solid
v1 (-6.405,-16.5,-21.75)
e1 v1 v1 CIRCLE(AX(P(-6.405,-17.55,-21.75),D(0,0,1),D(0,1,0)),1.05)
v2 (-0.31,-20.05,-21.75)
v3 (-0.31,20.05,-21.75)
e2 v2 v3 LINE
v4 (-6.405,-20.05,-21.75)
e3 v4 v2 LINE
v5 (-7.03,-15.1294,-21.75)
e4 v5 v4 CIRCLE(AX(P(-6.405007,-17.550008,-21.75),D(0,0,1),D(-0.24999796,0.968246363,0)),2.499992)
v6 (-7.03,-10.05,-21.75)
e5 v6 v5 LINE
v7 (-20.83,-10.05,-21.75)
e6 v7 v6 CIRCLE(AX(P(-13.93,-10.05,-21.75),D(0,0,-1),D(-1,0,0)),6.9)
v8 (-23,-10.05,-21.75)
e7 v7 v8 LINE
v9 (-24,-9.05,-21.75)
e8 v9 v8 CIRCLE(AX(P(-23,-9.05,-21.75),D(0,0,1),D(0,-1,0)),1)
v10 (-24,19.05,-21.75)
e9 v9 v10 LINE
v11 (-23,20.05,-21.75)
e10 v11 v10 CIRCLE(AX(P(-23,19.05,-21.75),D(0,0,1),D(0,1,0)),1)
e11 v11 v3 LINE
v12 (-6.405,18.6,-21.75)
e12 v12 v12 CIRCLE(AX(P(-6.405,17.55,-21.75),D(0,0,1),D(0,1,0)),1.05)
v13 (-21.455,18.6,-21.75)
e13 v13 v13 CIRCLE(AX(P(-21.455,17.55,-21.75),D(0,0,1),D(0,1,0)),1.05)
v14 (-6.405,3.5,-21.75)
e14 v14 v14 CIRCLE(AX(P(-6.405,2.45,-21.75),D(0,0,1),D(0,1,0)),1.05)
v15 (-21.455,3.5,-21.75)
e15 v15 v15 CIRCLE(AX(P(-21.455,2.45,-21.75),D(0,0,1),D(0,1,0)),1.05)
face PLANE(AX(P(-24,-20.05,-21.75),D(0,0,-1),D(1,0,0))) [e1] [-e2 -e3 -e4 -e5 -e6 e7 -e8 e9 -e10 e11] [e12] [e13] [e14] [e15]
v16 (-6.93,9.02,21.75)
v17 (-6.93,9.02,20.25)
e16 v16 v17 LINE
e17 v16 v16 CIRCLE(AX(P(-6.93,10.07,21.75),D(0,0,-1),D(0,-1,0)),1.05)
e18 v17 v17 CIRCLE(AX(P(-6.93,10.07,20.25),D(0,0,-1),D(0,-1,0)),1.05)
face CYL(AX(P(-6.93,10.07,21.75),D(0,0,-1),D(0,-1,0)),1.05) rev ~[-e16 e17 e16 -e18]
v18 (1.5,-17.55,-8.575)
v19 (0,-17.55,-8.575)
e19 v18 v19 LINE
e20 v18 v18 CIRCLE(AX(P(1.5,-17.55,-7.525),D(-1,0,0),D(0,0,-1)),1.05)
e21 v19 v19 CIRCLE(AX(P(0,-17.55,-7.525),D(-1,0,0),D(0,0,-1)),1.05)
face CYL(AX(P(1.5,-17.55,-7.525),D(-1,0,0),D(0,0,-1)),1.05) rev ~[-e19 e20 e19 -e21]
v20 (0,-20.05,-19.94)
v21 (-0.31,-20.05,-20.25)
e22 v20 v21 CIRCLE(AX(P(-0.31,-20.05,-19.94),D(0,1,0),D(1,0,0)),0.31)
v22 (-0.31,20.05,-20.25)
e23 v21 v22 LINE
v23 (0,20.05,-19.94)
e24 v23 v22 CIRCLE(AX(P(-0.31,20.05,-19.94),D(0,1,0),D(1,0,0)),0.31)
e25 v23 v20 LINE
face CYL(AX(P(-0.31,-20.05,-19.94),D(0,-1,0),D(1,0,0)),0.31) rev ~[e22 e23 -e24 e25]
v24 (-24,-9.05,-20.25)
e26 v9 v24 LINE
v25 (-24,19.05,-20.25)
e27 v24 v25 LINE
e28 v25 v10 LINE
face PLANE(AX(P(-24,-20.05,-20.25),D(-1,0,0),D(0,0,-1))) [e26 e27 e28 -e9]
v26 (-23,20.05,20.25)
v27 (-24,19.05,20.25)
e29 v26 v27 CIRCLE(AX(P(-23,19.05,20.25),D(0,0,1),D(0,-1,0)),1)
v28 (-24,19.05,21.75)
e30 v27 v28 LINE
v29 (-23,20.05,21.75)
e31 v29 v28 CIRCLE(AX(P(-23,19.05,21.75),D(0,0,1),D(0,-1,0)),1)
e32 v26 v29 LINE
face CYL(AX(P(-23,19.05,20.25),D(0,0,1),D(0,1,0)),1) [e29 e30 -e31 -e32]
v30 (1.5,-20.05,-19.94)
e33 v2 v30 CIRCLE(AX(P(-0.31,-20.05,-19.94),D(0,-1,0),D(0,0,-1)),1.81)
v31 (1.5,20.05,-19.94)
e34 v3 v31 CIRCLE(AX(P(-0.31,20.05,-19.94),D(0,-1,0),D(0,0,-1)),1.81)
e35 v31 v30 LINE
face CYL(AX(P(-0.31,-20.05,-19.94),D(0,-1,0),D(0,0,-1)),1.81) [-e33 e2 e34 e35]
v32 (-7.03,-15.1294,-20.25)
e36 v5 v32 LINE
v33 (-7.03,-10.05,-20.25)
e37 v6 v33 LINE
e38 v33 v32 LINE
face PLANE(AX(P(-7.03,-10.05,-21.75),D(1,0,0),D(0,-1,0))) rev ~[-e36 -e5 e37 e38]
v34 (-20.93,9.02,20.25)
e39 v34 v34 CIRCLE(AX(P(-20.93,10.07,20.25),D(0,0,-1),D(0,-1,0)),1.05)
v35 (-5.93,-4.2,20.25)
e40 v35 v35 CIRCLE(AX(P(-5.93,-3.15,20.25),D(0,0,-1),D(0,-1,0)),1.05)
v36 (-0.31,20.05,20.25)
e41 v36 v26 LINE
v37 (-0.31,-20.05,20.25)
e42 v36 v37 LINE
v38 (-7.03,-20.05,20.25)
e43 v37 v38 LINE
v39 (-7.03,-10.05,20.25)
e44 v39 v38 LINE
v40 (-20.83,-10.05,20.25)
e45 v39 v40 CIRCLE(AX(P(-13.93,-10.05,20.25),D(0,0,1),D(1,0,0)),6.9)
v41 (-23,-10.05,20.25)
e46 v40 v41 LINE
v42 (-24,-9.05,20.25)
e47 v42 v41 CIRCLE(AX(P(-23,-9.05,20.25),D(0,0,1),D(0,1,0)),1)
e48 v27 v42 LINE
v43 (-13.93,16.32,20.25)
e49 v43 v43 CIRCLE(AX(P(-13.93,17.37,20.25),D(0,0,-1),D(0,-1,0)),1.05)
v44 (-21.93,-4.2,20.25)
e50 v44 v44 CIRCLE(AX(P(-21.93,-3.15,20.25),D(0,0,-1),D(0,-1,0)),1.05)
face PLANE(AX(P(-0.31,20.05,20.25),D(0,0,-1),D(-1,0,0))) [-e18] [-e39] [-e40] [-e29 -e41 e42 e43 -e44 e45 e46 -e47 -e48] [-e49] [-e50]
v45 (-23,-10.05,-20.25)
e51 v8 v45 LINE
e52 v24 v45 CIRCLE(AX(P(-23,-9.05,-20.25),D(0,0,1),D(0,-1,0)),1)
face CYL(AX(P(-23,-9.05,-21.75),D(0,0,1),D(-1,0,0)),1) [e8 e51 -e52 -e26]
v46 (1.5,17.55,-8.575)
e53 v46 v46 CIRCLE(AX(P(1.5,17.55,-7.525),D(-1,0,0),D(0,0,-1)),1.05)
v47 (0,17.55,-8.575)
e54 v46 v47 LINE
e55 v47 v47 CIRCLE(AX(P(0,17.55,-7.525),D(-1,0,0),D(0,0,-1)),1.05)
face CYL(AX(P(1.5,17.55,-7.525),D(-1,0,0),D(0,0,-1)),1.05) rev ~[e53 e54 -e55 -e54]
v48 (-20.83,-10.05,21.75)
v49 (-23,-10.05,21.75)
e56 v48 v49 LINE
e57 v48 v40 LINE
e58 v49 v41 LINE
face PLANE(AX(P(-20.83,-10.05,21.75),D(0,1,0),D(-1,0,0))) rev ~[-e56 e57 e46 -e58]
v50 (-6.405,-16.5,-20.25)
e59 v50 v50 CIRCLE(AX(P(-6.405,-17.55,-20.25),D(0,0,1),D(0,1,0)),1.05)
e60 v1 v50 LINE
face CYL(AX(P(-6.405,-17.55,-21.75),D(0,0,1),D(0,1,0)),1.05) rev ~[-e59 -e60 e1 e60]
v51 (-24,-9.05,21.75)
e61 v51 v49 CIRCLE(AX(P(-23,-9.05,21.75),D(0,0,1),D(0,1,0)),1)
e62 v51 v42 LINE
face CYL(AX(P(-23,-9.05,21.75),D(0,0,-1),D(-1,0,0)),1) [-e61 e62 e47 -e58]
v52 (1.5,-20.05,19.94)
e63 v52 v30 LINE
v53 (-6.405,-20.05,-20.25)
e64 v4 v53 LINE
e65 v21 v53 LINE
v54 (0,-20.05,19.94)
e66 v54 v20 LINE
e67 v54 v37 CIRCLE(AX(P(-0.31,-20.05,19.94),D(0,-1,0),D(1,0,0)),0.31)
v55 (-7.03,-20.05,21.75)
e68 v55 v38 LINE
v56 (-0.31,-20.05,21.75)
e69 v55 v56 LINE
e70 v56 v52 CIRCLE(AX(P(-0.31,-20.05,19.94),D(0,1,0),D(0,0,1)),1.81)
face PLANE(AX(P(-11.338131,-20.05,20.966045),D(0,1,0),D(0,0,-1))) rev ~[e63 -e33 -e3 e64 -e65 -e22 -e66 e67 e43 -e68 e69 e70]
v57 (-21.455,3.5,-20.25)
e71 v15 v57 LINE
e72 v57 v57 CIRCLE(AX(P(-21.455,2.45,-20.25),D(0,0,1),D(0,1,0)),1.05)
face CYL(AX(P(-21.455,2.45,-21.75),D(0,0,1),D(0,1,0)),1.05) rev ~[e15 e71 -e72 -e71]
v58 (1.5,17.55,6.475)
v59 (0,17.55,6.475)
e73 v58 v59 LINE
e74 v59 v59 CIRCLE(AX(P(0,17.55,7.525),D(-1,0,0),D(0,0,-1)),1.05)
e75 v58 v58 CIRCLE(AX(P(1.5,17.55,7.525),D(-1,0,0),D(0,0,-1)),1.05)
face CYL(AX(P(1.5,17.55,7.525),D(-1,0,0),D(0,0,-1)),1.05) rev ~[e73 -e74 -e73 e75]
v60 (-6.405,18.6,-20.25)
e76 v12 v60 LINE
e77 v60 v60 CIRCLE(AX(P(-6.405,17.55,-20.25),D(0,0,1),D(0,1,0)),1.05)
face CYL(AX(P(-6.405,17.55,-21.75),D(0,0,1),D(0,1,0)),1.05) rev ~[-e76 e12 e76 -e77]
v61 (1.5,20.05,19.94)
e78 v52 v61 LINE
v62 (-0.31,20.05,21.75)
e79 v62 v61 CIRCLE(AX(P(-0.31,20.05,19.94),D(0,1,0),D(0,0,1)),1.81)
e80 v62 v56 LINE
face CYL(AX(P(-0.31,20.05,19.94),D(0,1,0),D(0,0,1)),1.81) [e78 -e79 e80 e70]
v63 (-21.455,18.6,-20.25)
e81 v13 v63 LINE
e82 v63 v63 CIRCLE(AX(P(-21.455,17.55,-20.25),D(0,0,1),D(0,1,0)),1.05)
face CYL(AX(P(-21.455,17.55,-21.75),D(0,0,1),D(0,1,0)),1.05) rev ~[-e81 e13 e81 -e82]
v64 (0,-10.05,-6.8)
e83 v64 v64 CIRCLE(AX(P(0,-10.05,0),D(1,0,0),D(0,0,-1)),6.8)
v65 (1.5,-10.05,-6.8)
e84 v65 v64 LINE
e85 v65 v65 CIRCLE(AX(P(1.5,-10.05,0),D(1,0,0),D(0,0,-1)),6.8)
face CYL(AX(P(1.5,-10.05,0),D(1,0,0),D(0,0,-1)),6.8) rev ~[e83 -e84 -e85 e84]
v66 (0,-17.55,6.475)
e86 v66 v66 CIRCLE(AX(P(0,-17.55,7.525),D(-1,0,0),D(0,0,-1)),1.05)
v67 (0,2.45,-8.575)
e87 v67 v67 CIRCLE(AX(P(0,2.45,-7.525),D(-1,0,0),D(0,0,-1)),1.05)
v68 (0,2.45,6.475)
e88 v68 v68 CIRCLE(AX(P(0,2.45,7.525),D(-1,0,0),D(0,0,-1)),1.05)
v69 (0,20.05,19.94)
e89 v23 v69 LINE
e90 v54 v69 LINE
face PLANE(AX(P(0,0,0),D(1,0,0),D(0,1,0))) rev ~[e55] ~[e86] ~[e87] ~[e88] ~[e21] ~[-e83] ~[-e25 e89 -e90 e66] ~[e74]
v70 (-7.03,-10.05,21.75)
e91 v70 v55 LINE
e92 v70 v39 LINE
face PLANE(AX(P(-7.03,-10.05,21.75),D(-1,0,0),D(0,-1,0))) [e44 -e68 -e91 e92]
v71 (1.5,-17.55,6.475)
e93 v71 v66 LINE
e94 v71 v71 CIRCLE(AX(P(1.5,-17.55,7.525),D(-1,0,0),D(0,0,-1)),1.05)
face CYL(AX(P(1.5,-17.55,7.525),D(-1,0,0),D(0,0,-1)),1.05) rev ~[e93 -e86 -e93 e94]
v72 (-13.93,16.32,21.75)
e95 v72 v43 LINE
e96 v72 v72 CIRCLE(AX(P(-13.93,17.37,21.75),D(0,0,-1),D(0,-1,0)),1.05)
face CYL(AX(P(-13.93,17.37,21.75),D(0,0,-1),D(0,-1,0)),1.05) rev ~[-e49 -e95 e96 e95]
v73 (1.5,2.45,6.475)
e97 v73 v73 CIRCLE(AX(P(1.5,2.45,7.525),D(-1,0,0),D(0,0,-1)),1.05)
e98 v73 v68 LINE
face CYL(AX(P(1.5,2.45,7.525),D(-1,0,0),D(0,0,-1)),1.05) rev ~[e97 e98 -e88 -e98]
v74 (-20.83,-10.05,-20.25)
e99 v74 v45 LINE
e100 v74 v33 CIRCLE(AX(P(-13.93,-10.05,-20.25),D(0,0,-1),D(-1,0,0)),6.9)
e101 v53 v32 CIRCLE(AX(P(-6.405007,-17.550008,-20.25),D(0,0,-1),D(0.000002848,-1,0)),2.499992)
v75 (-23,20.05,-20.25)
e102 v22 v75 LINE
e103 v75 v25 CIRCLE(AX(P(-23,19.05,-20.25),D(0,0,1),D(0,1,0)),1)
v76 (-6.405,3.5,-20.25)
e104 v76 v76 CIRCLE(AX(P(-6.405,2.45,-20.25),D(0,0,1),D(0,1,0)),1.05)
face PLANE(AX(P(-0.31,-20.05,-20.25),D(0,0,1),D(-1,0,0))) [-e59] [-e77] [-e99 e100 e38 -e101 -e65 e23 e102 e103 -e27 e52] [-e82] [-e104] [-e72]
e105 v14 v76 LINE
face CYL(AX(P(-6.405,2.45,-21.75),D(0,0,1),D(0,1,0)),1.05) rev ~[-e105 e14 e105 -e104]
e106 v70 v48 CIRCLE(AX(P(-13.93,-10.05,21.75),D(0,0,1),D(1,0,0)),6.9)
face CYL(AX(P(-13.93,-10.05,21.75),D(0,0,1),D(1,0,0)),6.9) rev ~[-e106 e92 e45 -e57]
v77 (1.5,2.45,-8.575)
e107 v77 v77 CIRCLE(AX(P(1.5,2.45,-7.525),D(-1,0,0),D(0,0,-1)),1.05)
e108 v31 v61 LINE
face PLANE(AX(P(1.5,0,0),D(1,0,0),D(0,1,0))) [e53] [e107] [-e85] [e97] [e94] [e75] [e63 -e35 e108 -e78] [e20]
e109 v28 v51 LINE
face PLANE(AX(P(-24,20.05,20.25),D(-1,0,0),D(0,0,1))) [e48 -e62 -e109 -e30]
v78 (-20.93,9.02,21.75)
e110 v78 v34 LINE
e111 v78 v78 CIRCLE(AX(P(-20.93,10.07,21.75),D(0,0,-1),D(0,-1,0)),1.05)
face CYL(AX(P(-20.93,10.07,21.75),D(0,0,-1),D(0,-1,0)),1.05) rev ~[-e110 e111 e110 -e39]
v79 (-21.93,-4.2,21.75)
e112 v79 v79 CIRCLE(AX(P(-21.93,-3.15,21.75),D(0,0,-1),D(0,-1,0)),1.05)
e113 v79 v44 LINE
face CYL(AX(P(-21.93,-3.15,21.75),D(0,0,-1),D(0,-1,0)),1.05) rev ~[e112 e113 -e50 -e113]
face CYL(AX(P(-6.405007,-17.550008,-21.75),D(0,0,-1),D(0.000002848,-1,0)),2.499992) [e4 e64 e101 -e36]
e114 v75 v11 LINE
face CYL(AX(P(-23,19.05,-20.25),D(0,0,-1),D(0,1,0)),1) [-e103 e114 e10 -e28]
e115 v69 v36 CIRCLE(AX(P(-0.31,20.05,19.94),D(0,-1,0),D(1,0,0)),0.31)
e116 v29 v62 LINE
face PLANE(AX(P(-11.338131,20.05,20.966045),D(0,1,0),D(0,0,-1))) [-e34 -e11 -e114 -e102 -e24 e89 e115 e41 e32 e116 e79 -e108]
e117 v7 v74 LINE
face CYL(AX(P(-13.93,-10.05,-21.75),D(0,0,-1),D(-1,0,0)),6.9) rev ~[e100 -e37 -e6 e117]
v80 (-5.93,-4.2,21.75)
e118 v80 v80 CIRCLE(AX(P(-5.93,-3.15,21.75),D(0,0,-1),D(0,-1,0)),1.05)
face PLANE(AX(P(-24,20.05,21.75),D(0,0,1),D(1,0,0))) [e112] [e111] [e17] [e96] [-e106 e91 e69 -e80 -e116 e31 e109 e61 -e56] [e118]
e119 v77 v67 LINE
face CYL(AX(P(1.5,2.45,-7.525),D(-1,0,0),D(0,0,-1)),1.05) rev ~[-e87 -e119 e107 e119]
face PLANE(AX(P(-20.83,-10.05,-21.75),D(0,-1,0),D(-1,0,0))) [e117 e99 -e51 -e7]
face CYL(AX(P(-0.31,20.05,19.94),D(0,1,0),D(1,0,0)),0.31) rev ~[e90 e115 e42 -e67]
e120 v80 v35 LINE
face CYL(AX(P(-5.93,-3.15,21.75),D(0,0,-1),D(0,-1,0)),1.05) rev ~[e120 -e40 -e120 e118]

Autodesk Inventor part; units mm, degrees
ref_plane "YZ Plane" through (0, 0, 0) normal (1, 0, 0) x (0, 1, 0)
ref_plane "XZ Plane" through (0, 0, 0) normal (0, 1, 0) x (-1, 0, 0)
sketch "Sketch1" plane through (0, 0, 0) normal (1, 0, 0) x (0, 1, 0)
  line L0 (20.05, 20.25) -> (-20.05, 20.25)
  line L1 (-20.05, 20.25) -> (-20.05, -20.25)
  line L2 (-20.05, -20.25) -> (20.05, -20.25)
  line L3 (20.05, -20.25) -> (20.05, 20.25)
  line L4 (20.05, 20.25) -> (-20.05, -20.25) construction
  line L5 (-20.05, 20.25) -> (20.05, -20.25) construction
  point P0 (0, 0)
  dimension "d0" = 40.1
  dimension "d1" = 40.5
extrude "Plate1" add sketch "Sketch1" along normal blind 1.5
sketch "Sketch2" plane through (0, 20.05, 20.25) normal (0, 0, 1) x (1, 0, 0)
  line L0 (0, -40.1) -> (0, 0)
  line L1 (0, 0) -> (-24, 0)
  line L2 (-24, 0) -> (-24, -40.1)
  line L3 (-24, -40.1) -> (0, -40.1)
edge flange "Flange1" height 25.5 angle 90 thickness 1.5 bend radius 0.31 thickness toward (0, 0, 1) relief tear relief width 1.5 relief depth 0.75 corner gap 0.31 corner form 0 edges at (0, 0, 20.25) (0, 0, -20.25) wall of the first edge with corners at (0, -20.05, 20.25) (0, 20.05, 20.25) (-24, 20.05, 20.25) (-24, -20.05, 20.25)
bend "Bend1"
corner "Corner1"
sketch "Sketch3" plane through (-24, -20.05, 21.75) normal (0, 0, 1) x (1, 0, 0)
  circle A0 centre (10.07, 10) radius 6.4 projected
  line L0 (0, 0) -> (0, 40.1) projected
  line L1 (23.69, 0) -> (0, 0) projected
  line L2 (23.69, 0) -> (23.69, 40.1) projected
  circle A1 centre (10.07, 10) radius 6.9
  line L3 (3.17, 10) -> (0, 10)
  line L4 (16.97, 10) -> (16.97, 0)
  point P0 (24, 20.05)
  point P1 (10.07, 3.1)
  point P2 (10.07, 0)
  dimension "d13" = 0.5
sketch "Sketch4" plane through (-24, -20.05, -21.75) normal (0, 0, -1) x (-1, 0, 0)
  line L0 (-3.17, 10) -> (0, 10) projected
  line L1 (0, 0) -> (0, 40.1) projected
  circle A0 centre (-10.07, 10) radius 6.9 projected
  line L2 (-16.97, 10) -> (-16.97, 0) projected
  line L3 (-23.69, 0) -> (0, 0) projected
  arc A1 (-17.595, 0) -> (-16.97, 4.9206) centre (-17.595, 2.5) ccw
  point P0 (-24, 20.05)
  dimension "d53" = 5
  dimension "d54" = 2.5
  dimension "d55" = 0.625
extrude "Cut1" cut sketch "Sketch3" against normal blind 1.5 contours A0 | L0 L3 A1 L4 L1 | A1
extrude "Cut2" cut sketch "Sketch4" against normal blind 1.5 contours A0 | L0 L1 L3 L2 A1 A0 | L3 A1 L2
ref_plane "Work Plane1" through (-24, 20.05, 0) normal (0, 0, 1) x (1, 0, 0)
sketch "Sketch5" plane through (-24, 20.05, 21.75) normal (0, 0, 1) x (1, 0, 0)
  circle A0 centre (18.07, -23.2) radius 0.7835 projected
  circle A1 centre (2.07, -23.2) radius 0.7835 projected
  circle A2 centre (3.07, -9.98) radius 0.7835 projected
  circle A3 centre (17.07, -9.98) radius 0.7835 projected
  circle A4 centre (10.07, -2.68) radius 0.7835 projected
  point P0 (24, -20.05)
hole "Hole1" at (-13.93, 17.37, 21.75) at (-20.93, 10.07, 21.75) at (-6.93, 10.07, 21.75) at (-21.93, -3.15, 21.75) at (-5.93, -3.15, 21.75) direction (0, 0, -1) diameter 2.1 depth 1.5
sketch "Sketch6" plane through (-0.31, 20.05, -21.75) normal (0, 0, -1) x (-1, 0, 0)
  circle A0 centre (6.095, -17.6) radius 0.7835 projected
  circle A1 centre (6.095, -2.5) radius 0.7835 projected
  circle A2 centre (21.145, -2.5) radius 0.7835 projected
  circle A3 centre (21.145, -17.6) radius 0.7835 projected
  circle A4 centre (6.095, -37.6) radius 0.7835 projected
  point P0 (-0.31, -20.05)
fillet "Corner Round1" radius 1 4 edges at (-24, 20.05, -21) (-24, -10.05, -21) (-24, 20.05, 21) (-24, -10.05, 21)
hole "Hole3" at (-6.405, 17.55, -21.75) at (-21.455, 17.55, -21.75) at (-6.405, 2.45, -21.75) at (-21.455, 2.45, -21.75) at (-6.405, -17.55, -21.75) direction (0, 0, 1) diameter 2.1 depth 1.5
sketch "Sketch9" plane through (1.5, 0, 0) normal (1, 0, 0) x (0, 0, -1)
  circle A0 centre (7.525, 17.55) radius 0.7835
  circle A1 centre (-7.525, 17.55) radius 0.7835
  circle A2 centre (-7.525, 2.45) radius 0.7835
  circle A3 centre (7.525, 2.45) radius 0.7835
  circle A4 centre (7.525, -17.55) radius 0.7835
  circle A5 centre (-7.525, -17.55) radius 0.7835
  point P0 (0, 0)
hole "Hole4" at (1.5, 17.55, 7.525) at (1.5, 17.55, -7.525) at (1.5, 2.45, 7.525) at (1.5, 2.45, -7.525) at (1.5, -17.55, 7.525) at (1.5, -17.55, -7.525) direction (-1, 0, 0) diameter 2.1 end through all
sketch "Sketch10" plane through (1.5, 0, 0) normal (1, 0, 0) x (0, 0, -1)
  circle A0 centre (0, -10.05) radius 6.4
  circle A1 centre (0, -10.05) radius 6.8
  point P0 (0, 0)
  dimension "d50" = 0.4
extrude "Extrusion1" cut sketch "Sketch10" against normal through all contours A0 | A1
equation "\"d14\" = Thickness"
equation "\"d16\" = Thickness"
equation "\"d23\" = Thickness"
equation "\"d41\" = Thickness"
equation "\"d48\" = Thickness"
equation "\"d2\" = Thickness"
equation "\"d3\" = BendReliefWidth"
equation "\"d4\" = BendReliefDepth"
equation "\"d5\" = MinimumRemnant"
equation "\"d6\" = TransitionRadius"
equation "\"d9\" = BendRadius"
equation "\"d10\" = CornerReliefSize"
equation "\"d11\" = GapSize"
equation "\"d12\" = JacobiRadiusSize"
equation "\"BendReliefWidth\" = Thickness"
equation "\"BendReliefDepth\" = 0.5 * Thickness"
equation "\"CornerReliefSize\" = 4 * Thickness"
equation "\"MinimumRemnant\" = 2 * Thickness"
equation "\"TransitionRadius\" = BendRadius"
equation "\"JacobiRadiusSize\" = BendRadius"
equation "\"GapSize\" = Thickness"
equation "\"Thickness\" = 1.5"
equation "\"BendRadius\" = 0.31"
properties part number "axis_3_top_frame" material "Aluminum 6061-AHC"
